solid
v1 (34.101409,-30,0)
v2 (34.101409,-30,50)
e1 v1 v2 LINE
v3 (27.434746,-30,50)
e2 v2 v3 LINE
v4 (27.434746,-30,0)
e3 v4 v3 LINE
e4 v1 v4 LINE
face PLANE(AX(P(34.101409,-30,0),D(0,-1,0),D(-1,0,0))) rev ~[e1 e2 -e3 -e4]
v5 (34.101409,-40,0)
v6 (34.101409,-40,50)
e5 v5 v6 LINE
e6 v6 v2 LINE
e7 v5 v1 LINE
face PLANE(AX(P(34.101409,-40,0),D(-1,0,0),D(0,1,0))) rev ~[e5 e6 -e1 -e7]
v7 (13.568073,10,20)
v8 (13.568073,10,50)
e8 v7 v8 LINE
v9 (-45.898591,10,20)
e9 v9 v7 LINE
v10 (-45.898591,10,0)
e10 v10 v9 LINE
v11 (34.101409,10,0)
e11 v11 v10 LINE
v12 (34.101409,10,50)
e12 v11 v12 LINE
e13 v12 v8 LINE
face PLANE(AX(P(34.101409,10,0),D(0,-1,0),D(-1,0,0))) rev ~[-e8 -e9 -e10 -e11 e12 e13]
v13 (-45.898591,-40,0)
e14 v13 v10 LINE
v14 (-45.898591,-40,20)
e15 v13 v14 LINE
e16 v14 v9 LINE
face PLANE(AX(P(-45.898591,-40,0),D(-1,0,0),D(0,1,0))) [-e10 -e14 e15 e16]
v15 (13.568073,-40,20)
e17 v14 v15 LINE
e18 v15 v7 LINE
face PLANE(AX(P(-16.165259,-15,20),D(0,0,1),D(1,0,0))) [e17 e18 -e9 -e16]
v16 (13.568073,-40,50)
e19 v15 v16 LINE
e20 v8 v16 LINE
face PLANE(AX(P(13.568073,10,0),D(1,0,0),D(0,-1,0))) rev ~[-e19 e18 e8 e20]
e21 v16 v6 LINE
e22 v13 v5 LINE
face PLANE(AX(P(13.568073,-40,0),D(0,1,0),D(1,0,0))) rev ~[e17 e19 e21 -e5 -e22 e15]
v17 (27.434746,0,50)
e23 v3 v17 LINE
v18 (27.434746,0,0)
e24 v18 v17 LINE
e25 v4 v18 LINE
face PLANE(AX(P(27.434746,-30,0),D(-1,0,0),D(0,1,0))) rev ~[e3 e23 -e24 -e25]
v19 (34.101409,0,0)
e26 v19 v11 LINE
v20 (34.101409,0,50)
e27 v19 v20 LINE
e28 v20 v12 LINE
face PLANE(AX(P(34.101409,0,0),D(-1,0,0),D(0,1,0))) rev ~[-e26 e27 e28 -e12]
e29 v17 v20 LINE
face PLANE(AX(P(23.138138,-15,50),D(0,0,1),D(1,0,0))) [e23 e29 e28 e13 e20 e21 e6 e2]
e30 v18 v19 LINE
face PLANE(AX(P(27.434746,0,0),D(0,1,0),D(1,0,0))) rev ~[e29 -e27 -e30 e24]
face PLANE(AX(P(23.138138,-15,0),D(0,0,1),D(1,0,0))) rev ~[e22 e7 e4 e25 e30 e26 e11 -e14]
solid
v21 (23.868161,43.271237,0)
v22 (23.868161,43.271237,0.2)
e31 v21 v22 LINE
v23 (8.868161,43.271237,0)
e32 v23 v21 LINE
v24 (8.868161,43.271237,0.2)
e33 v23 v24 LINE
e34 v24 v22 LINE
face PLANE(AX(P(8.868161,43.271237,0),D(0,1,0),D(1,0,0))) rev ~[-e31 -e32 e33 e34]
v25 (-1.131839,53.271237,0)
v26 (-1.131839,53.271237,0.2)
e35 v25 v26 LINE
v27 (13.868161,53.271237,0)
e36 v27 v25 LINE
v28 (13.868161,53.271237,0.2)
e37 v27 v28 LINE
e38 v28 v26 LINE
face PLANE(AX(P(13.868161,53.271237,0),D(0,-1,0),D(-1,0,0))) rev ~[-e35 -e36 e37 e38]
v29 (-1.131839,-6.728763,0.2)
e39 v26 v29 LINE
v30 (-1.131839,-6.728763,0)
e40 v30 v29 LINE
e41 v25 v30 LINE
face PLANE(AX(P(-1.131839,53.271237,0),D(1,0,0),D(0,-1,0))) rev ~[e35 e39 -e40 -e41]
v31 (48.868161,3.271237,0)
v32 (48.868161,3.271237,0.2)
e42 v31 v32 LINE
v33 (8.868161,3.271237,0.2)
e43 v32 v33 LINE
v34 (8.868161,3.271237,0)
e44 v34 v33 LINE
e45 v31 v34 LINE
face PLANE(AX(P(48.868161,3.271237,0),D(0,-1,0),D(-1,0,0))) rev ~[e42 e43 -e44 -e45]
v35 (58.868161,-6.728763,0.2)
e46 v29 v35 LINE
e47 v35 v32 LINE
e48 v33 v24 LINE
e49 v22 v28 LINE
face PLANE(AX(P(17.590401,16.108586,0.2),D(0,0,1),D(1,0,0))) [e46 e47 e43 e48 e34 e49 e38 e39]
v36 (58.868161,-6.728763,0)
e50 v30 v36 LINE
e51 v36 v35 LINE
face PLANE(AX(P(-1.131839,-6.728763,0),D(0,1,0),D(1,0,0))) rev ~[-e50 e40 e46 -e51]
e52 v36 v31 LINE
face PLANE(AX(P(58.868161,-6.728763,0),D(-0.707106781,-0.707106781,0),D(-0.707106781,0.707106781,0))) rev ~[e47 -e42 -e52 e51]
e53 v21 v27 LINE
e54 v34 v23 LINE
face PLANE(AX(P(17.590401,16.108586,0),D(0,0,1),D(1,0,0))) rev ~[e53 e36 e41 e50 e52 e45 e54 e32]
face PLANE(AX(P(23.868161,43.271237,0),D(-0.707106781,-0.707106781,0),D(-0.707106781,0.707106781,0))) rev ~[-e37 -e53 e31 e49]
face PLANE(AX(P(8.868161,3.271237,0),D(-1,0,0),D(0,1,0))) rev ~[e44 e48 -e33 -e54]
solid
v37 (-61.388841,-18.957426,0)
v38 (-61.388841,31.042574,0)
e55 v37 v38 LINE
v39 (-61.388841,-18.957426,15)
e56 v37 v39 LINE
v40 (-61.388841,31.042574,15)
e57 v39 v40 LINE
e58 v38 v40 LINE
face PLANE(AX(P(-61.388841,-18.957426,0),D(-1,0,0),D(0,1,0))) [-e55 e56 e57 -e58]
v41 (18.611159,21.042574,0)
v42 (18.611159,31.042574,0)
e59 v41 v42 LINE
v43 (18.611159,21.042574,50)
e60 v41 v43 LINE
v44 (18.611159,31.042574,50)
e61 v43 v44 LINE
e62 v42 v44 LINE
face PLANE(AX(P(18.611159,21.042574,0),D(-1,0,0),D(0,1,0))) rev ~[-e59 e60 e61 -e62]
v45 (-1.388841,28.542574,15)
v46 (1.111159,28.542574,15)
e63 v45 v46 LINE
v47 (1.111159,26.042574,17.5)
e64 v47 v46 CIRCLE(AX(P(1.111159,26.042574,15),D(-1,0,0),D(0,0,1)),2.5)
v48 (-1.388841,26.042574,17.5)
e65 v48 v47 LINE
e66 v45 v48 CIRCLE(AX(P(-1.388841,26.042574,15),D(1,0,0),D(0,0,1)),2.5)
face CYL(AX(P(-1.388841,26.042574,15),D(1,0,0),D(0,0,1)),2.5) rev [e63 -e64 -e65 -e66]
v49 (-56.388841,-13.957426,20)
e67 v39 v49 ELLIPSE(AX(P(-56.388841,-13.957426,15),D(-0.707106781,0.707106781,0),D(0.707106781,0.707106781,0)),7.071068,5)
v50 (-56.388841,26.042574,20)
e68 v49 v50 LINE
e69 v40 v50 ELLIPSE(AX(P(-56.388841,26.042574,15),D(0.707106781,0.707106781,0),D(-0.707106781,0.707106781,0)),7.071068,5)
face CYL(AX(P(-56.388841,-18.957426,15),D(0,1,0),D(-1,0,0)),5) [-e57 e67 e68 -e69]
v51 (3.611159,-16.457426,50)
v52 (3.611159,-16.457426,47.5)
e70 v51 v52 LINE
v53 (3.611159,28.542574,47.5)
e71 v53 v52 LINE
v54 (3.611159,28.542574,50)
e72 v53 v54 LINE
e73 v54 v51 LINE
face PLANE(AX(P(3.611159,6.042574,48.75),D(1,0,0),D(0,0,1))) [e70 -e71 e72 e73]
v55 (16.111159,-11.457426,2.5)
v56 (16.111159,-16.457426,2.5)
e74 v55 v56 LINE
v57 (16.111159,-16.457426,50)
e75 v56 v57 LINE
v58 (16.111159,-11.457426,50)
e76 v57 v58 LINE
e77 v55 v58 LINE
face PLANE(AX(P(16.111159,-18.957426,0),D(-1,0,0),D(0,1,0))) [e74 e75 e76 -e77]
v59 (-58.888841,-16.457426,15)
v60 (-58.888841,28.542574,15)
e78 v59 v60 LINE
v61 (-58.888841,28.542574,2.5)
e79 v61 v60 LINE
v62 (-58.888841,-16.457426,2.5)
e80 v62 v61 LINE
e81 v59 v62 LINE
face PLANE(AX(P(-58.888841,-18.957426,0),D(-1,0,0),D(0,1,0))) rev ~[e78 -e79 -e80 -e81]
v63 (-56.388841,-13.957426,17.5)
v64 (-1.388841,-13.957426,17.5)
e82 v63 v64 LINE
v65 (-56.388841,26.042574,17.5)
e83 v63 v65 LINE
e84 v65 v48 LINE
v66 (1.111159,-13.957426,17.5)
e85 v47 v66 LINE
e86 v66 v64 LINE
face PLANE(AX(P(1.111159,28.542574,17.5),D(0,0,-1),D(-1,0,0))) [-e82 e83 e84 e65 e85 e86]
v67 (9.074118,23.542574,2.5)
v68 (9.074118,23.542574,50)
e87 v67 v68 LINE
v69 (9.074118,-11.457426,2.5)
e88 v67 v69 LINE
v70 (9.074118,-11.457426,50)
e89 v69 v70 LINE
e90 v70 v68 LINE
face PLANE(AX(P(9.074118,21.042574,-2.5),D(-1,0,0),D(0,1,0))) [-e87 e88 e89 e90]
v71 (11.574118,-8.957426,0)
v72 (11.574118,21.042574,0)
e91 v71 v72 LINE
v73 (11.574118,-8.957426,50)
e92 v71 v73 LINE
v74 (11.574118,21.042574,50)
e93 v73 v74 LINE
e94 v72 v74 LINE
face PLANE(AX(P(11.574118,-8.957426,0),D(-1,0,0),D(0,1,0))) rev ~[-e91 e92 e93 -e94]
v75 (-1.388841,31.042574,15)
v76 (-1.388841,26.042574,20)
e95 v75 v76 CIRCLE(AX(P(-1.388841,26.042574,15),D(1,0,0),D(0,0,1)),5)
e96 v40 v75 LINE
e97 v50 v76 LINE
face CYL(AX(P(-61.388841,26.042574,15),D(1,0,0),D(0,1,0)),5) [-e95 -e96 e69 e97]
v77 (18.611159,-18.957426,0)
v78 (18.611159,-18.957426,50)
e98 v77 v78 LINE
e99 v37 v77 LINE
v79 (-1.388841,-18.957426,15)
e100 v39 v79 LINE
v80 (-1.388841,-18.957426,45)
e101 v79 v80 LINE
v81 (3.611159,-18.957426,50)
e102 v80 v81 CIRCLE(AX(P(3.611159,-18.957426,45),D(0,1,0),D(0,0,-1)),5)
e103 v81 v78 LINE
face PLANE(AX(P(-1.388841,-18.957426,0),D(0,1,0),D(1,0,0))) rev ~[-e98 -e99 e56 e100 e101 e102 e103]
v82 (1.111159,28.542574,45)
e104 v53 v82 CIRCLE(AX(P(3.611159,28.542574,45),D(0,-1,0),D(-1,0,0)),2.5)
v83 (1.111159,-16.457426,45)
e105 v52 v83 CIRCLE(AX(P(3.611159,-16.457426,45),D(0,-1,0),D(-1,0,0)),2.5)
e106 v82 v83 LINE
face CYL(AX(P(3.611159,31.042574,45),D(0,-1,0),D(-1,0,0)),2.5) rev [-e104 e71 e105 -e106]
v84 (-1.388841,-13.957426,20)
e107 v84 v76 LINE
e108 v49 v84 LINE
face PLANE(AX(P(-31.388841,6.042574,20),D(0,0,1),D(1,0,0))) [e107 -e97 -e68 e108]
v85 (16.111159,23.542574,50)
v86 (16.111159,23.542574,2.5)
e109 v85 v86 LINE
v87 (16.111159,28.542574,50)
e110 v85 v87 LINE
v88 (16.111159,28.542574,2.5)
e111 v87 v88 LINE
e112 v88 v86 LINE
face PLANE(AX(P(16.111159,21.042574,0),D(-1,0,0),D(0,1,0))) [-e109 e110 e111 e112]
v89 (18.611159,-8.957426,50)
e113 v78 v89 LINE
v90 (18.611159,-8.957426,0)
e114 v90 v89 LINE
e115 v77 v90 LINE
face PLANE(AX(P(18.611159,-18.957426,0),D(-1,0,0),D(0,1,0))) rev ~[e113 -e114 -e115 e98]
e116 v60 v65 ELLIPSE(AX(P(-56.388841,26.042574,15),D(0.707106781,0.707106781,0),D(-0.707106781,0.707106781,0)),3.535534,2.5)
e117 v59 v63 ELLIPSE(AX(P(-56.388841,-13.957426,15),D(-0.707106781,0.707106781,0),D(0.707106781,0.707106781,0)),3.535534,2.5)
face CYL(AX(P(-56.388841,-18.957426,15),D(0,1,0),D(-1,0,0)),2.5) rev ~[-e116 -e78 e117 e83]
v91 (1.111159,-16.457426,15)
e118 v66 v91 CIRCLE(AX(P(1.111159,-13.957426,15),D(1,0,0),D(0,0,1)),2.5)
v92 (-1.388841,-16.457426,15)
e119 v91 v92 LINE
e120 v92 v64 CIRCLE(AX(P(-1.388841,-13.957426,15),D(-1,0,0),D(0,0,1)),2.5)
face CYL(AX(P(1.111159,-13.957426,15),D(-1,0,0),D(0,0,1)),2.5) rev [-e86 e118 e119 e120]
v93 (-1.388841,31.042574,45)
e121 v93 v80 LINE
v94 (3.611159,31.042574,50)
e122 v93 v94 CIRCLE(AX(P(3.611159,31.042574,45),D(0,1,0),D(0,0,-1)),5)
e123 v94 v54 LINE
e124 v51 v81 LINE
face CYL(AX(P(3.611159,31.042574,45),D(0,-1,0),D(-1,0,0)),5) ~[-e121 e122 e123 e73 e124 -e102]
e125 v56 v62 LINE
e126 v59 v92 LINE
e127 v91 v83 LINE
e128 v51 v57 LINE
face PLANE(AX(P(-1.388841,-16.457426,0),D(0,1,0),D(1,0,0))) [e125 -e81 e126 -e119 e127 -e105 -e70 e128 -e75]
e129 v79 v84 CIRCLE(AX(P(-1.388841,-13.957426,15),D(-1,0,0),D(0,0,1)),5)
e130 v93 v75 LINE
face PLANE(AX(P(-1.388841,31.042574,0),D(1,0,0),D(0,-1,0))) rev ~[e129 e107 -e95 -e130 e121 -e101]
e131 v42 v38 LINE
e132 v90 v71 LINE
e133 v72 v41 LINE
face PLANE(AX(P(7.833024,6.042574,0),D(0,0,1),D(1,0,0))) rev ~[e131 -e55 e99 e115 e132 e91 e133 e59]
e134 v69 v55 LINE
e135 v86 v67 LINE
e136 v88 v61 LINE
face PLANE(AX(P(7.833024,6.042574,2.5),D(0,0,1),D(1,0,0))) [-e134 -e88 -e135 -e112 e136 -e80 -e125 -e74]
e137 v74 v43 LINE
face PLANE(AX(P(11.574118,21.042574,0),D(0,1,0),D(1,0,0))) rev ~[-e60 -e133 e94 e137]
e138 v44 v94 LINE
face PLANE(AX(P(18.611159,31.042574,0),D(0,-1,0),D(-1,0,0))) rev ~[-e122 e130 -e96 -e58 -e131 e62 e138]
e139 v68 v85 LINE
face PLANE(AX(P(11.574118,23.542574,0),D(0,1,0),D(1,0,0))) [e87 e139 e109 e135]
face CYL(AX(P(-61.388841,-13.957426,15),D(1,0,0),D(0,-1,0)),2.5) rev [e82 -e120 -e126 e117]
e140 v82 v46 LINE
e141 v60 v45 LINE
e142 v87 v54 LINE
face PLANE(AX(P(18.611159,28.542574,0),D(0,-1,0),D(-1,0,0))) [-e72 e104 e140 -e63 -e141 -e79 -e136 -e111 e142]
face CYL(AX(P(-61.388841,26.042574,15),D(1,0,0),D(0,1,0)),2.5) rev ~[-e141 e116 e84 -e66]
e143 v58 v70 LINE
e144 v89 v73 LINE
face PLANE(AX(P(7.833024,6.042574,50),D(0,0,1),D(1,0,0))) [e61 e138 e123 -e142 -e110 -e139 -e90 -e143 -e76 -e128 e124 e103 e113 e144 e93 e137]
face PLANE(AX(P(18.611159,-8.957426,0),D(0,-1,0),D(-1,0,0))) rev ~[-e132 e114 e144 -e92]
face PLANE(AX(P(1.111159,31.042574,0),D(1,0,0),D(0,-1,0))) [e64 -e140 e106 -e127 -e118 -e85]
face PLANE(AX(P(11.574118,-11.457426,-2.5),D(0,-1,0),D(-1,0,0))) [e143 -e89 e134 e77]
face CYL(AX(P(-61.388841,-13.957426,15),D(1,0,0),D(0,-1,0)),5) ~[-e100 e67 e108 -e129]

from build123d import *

# Parameters (mm, degrees)
F1_DEPTH     = 0.2
F2_W         = 60
F2_H         = 50
F3_DEPTH     = 20
F4_DEPTH     = 50
F5_W         = 59.4666637367
F5_H         = 50
F6_DEPTH     = 20
F7_DEPTH     = 50
F8_R         = 5
F9_T         = 2.5
F9_T3_DEPTH  = 45
F9_T5_DEPTH  = 55
F9_T8_ANGLE  = 90.000000001
F9_T10_ANGLE = 90.000000001


# Not quite as in the source:
# - a shell that OpenCascade refuses in one call is made with other operations: the cavity is built on its own and cut out


with BuildPart() as f1:
    # F0 (on Top) → F1 (new body)
    with BuildSketch(Plane.XY):
        Polygon((23.8681607499, 43.2712367737), (13.8681607499, 53.2712367737), (-1.1318392501, 53.2712367737), (-1.1318392501, -6.7287632263), (58.8681607499, -6.7287632263), (48.8681607499, 3.2712367737), (8.8681607499, 3.2712367737), (8.8681607499, 43.2712367737), align=None)
    extrude(amount=F1_DEPTH)


with BuildPart() as f3:
    # F2 (on Top) → F3 (new body)
    with BuildSketch(Plane.XY):
        with Locations((-31.3888411792, 6.0425736521)):
            Rectangle(F2_W, F2_H)
    extrude(amount=F3_DEPTH)

    # F2 (on Top) → F4 (join)
    with BuildSketch(Plane.XY):
        Polygon((-1.3888411792, 31.0425736521), (-1.3888411792, -18.9574263479), (18.6111588208, -18.9574263479), (18.6111588208, -8.9574263479), (11.5741182365, -8.9574263479), (11.5741182365, 21.0425736521), (18.6111588208, 21.0425736521), (18.6111588208, 31.0425736521), align=None)
    extrude(amount=F4_DEPTH)

    # F8
    f8_edges = [f3.edges().sort_by_distance(p)[0] for p in [
        (-1.388841, 6.042574, 50),
        (-61.388841, 6.042574, 20),
        (-31.388841, -18.957426, 20),
        (-31.388841, 31.042574, 20),
    ]]
    fillet(f8_edges, radius=F8_R)

    # F9: shell of thickness 2.5, made by hand


with BuildPart() as f6:
    # F5 (on Top) → F6 (new body)
    with BuildSketch(Plane.XY):
        with Locations((-16.1652588892, -15)):
            Rectangle(F5_W, F5_H)
    extrude(amount=F6_DEPTH)

    # F5 (on Top) → F7 (join)
    with BuildSketch(Plane.XY):
        Polygon((13.5680729791, 10), (13.5680729791, -40), (34.1014092424, -40), (34.1014092424, -30), (27.4347461201, -30), (27.4347461201, 0), (34.1014092424, 0), (34.1014092424, 10), align=None)
    extrude(amount=F7_DEPTH)


with BuildPart() as f9_core1:
    # F9_t2: copy of F3
    add(f3.part)

    # the walls: a layer under each face that stays
    f9_faces = [f9_core1.faces().sort_by_distance(p)[0] for p in [
        (-61.3888411792, 6.0425736521, 7.5),
        (5.2778254875, 31.0425736521, 41.6666666667),
        (-59.9243750851, 6.0425736521, 18.5355339059),
        (-21.3888411792, 6.0425736521, 0),
        (-48.0555078458, -18.9574263479, 8.3333333333),
        (-31.3888411792, 29.578107558, 18.5355339059),
        (-1.3888411792, 6.0425736521, 30),
        (18.6111588208, 26.0425736521, 25),
        (0.0756249149, 6.0425736521, 48.5355339059),
        (-28.8888411792, 6.0425736521, 20),
        (-31.3888411792, -17.4929602538, 18.5355339059),
        (18.6111588208, -13.9574263479, 25),
        (15.0926385287, -8.9574263479, 25),
        (11.5741182365, 6.0425736521, 25),
        (15.0926385287, 21.0425736521, 25),
    ]]
    thicken(f9_faces, amount=-F9_T, mode=Mode.SUBTRACT)

    # F9_s4 → F9_t3 (cut)
    with BuildSketch(Plane.XZ.offset(-28.5425736521)):
        Polygon((-1.4138411792, 20.025), (1.1111588208, 20), (1.1111588208, 17.5), (-1.3888411792, 17.5), align=None)
    extrude(amount=F9_T3_DEPTH, mode=Mode.SUBTRACT)

    # F9_s6 → F9_t5 (cut)
    with BuildSketch(Plane.XY.offset(-2.5)):
        Polygon((11.5991182365, -8.9324263479), (11.5741182365, -11.4574263479), (9.0741182365, -11.4574263479), (9.0741182365, -8.9574263479), align=None)
        Polygon((11.5991182365, 21.0175736521), (9.0741182365, 21.0425736521), (9.0741182365, 23.5425736521), (11.5741182365, 23.5425736521), align=None)
    extrude(amount=F9_T5_DEPTH, mode=Mode.SUBTRACT)

    # F9_s7 → F9_t8 (revolve, cut)
    with BuildSketch(Plane.XZ.offset(-26.0425736521)):
        Polygon((-1.4138411792, 20.025), (-1.3888411792, 17.5), (1.1111588208, 17.5), (1.1111588208, 20), align=None)
    revolve(axis=Axis((-1.3888411792, 26.0425736521, 15), (-1, 0, 0)), revolution_arc=F9_T8_ANGLE, mode=Mode.SUBTRACT)

    # F9_s9 → F9_t10 (revolve, cut)
    with BuildSketch(Plane.XZ.offset(13.9574263479)):
        Polygon((-1.4138411792, 20.025), (1.1111588208, 20), (1.1111588208, 17.5), (-1.3888411792, 17.5), align=None)
    revolve(axis=Axis((-1.3888411792, -13.9574263479, 15), (1, 0, 0)), revolution_arc=F9_T10_ANGLE, mode=Mode.SUBTRACT)


with BuildPart() as f3_1:
    add(f3.part)

    # what is left inside the walls is the cavity
    f9_cavity = [f9_core1.part.solids().sort_by_distance(p)[0] for p in [
        (-21.388841, -1.457426, 2.525),
    ]]
    add(f9_cavity, mode=Mode.SUBTRACT)


solid = Compound([f1.part, f6.part, f3_1.part])
